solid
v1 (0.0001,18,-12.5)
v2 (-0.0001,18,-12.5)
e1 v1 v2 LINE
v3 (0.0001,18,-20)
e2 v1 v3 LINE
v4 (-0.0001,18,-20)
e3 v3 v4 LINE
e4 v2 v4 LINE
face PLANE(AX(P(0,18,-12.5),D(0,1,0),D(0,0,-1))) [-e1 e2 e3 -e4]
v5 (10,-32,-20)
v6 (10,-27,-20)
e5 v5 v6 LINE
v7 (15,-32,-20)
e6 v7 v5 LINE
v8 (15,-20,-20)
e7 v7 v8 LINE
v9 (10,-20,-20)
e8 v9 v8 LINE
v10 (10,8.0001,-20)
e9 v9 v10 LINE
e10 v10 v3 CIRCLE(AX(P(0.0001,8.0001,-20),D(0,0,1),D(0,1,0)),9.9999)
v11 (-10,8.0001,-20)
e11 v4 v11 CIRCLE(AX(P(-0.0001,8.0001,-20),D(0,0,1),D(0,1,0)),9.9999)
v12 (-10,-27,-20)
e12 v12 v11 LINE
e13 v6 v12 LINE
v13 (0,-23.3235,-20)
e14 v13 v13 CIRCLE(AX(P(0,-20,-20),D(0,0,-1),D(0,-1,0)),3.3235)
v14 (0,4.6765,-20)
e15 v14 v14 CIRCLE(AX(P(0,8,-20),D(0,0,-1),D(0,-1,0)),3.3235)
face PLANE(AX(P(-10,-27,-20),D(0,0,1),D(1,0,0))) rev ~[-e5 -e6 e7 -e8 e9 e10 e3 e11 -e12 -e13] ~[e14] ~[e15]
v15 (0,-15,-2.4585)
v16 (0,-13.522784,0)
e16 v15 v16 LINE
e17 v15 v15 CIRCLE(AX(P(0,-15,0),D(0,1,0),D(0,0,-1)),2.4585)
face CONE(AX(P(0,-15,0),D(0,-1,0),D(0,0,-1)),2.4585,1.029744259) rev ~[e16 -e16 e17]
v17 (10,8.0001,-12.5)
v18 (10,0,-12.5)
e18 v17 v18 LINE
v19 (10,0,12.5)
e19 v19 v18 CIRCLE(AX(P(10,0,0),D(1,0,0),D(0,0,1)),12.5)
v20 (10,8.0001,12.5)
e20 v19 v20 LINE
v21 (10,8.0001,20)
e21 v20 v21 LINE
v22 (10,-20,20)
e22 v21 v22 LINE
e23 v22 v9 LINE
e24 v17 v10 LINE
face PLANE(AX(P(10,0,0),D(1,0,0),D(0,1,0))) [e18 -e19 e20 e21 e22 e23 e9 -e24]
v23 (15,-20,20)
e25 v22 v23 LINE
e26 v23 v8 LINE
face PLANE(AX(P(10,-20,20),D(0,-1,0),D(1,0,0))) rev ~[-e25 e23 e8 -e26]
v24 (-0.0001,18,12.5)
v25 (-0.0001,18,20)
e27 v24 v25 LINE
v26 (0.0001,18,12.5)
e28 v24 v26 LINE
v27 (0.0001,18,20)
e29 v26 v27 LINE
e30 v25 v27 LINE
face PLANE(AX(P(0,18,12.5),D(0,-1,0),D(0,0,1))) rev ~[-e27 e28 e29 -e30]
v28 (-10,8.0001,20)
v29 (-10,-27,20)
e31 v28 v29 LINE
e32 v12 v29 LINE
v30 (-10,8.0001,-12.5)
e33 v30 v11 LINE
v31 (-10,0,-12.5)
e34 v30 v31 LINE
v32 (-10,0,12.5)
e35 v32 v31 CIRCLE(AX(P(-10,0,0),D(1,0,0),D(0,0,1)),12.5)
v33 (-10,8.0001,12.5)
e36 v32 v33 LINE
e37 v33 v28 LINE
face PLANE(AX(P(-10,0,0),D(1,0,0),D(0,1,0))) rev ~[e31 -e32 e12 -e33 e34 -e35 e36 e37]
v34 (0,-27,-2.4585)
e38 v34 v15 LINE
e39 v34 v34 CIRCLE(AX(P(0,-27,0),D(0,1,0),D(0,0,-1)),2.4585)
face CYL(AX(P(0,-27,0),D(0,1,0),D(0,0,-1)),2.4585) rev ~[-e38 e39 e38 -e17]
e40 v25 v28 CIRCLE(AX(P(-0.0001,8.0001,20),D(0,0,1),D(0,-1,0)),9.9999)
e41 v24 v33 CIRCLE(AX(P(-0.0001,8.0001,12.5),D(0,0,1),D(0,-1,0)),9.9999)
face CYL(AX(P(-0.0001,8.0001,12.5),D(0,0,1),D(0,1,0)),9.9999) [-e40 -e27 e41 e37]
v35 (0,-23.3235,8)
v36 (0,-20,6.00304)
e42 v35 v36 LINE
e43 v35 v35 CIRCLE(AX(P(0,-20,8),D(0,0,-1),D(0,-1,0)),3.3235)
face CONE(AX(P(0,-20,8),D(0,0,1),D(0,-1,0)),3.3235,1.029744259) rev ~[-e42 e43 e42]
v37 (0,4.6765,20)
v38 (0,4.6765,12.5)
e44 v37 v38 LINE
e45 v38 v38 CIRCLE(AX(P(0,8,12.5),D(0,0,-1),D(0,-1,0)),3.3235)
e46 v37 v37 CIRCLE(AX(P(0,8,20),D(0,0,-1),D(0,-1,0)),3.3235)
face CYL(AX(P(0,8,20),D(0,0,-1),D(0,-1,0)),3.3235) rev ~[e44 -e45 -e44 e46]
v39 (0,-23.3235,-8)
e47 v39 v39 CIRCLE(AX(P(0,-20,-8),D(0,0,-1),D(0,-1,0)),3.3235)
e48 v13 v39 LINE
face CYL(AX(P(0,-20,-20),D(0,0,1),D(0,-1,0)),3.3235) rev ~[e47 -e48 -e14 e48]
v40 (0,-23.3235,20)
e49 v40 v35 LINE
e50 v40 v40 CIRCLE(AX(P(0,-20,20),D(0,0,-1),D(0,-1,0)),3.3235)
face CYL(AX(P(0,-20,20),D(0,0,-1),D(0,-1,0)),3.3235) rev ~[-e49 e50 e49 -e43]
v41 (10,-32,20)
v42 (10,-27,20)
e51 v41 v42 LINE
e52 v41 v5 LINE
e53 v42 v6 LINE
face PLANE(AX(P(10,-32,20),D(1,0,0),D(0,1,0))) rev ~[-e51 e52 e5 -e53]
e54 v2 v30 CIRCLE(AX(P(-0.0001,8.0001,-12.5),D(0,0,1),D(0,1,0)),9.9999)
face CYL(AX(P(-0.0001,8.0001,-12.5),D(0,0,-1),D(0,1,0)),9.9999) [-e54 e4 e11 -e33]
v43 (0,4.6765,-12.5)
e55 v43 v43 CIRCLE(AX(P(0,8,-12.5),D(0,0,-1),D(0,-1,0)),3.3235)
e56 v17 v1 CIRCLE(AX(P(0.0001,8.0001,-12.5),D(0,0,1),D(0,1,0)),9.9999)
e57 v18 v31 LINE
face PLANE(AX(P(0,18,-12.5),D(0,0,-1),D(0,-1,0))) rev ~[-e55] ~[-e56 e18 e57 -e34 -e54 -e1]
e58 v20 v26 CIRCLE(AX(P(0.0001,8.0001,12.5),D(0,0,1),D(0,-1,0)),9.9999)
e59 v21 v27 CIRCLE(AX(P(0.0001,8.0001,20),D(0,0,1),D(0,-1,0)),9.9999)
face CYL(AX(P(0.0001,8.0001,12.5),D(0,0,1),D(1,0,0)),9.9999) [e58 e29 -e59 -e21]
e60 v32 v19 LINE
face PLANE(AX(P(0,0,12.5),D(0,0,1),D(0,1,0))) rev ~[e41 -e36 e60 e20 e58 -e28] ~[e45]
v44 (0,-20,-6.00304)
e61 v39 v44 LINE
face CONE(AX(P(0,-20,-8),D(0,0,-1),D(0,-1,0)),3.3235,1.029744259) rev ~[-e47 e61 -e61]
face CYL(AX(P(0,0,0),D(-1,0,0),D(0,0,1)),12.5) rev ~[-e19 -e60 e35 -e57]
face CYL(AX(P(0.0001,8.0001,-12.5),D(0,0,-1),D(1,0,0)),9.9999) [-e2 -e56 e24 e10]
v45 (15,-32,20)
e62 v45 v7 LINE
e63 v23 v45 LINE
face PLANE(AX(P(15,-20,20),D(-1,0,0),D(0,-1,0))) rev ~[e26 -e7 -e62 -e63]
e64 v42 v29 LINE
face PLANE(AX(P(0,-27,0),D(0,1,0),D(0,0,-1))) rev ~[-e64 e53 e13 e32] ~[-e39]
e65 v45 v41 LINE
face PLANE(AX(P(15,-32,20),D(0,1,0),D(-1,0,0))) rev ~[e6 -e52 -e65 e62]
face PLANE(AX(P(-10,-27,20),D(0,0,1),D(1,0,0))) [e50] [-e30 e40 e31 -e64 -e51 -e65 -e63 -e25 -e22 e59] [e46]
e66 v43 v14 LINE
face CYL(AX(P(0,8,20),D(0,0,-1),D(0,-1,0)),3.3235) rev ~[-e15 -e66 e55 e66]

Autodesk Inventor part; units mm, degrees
ref_plane "YZ Plane" through (0, 0, 0) normal (1, 0, 0) x (0, 1, 0)
ref_plane "XZ Plane" through (0, 0, 0) normal (0, 1, 0) x (-1, 0, 0)
ref_plane "XY Plane" through (0, 0, 0) normal (0, 0, 1) x (1, 0, 0)
sketch "草圖1" plane through (0, 0, 0) normal (1, 0, 0) x (0, 1, 0)
  arc A0 (0, 12.5) -> (0, -12.5) centre (0, 0) ccw
  line L0 (-27, 0) -> (-27, -20)
  line L1 (-27, -20) -> (18, -20)
  line L2 (18, 20) -> (-27, 20)
  line L3 (-27, 20) -> (-27, 0)
  line L4 (0, 12.5) -> (18, 12.5)
  line L5 (18, -12.5) -> (0, -12.5)
  line L6 (18, -12.5) -> (18, -20)
  line L7 (18, 12.5) -> (18, 20)
  dimension "d5" = 25
  dimension "d12" = 18
  dimension "d13" = 45
  dimension "d15" = 40
  dimension "d16" = 45
  dimension "d17" = 7.5
  dimension "d18" = 7.5
  dimension "d19" = 18
extrude "擠出1" add sketch "草圖1" along normal mid plane 20
sketch "草圖2" plane through (-10, -27, 20) normal (0, 0, 1) x (1, 0, 0)
  line L0 (20, 0) -> (20, 45) projected
  line L1 (20, 0) -> (20, 7)
  line L2 (20, 7) -> (25, 7)
  line L3 (25, 7) -> (25, 0)
  line L4 (25, 0) -> (25, -5)
  line L5 (25, -5) -> (20, -5)
  line L6 (0, 0) -> (20, 0) projected
  line L7 (20, -5) -> (20, 0)
  point P0 (10, 27)
  dimension "d22" = 7
  dimension "d23" = 5
  dimension "d24" = 5
extrude "擠出2" add sketch "草圖2" against normal up to surface (40 mm away)
fillet "圓角1" radius 10 4 edges at (10, 18, 16.25) (-10, 18, 16.25) (10, 18, -16.25) (-10, 18, -16.25)
sketch "草圖3" plane through (10, -32, 20) normal (0, 0, 1) x (1, 0, 0)
  line L0 (-20, 5) -> (0, 5) projected
  point P0 (-10, 32)
  point P1 (-10, 40)
  dimension "d30" = 35
hole "孔1" at (0, 8, 20) direction (0, 0, -1) diameter 6.647 end through all thread size "M8x1.25" class "6H" standard "ISO Metric profile"
sketch "草圖4" plane through (10, -32, 20) normal (0, 0, 1) x (1, 0, 0)
  line L0 (-20, 5) -> (0, 5) projected
  point P0 (-10, 32)
  point P1 (-10, 12)
  dimension "d38" = 7
hole "孔2" at (0, -20, 20) direction (0, 0, -1) diameter 6.647 depth 12 tip angle 118 thread size "M8x1.25" class "6H" standard "ISO Metric profile"
mirror "鏡射1" about plane through (0, 0, 0) normal (0, 0, 1) of "孔2"
sketch "草圖5" plane through (-10, -27, -20) normal (0, -1, 0) x (1, 0, 0)
  point P0 (10, 20)
  point P1 (10, 20)
hole "孔3" at (0, -27, 0) direction (0, 1, 0) diameter 4.917 depth 12 tip angle 118 thread size "M6x1" class "6H" standard "ISO Metric profile"
properties part number "7. 砲座"
